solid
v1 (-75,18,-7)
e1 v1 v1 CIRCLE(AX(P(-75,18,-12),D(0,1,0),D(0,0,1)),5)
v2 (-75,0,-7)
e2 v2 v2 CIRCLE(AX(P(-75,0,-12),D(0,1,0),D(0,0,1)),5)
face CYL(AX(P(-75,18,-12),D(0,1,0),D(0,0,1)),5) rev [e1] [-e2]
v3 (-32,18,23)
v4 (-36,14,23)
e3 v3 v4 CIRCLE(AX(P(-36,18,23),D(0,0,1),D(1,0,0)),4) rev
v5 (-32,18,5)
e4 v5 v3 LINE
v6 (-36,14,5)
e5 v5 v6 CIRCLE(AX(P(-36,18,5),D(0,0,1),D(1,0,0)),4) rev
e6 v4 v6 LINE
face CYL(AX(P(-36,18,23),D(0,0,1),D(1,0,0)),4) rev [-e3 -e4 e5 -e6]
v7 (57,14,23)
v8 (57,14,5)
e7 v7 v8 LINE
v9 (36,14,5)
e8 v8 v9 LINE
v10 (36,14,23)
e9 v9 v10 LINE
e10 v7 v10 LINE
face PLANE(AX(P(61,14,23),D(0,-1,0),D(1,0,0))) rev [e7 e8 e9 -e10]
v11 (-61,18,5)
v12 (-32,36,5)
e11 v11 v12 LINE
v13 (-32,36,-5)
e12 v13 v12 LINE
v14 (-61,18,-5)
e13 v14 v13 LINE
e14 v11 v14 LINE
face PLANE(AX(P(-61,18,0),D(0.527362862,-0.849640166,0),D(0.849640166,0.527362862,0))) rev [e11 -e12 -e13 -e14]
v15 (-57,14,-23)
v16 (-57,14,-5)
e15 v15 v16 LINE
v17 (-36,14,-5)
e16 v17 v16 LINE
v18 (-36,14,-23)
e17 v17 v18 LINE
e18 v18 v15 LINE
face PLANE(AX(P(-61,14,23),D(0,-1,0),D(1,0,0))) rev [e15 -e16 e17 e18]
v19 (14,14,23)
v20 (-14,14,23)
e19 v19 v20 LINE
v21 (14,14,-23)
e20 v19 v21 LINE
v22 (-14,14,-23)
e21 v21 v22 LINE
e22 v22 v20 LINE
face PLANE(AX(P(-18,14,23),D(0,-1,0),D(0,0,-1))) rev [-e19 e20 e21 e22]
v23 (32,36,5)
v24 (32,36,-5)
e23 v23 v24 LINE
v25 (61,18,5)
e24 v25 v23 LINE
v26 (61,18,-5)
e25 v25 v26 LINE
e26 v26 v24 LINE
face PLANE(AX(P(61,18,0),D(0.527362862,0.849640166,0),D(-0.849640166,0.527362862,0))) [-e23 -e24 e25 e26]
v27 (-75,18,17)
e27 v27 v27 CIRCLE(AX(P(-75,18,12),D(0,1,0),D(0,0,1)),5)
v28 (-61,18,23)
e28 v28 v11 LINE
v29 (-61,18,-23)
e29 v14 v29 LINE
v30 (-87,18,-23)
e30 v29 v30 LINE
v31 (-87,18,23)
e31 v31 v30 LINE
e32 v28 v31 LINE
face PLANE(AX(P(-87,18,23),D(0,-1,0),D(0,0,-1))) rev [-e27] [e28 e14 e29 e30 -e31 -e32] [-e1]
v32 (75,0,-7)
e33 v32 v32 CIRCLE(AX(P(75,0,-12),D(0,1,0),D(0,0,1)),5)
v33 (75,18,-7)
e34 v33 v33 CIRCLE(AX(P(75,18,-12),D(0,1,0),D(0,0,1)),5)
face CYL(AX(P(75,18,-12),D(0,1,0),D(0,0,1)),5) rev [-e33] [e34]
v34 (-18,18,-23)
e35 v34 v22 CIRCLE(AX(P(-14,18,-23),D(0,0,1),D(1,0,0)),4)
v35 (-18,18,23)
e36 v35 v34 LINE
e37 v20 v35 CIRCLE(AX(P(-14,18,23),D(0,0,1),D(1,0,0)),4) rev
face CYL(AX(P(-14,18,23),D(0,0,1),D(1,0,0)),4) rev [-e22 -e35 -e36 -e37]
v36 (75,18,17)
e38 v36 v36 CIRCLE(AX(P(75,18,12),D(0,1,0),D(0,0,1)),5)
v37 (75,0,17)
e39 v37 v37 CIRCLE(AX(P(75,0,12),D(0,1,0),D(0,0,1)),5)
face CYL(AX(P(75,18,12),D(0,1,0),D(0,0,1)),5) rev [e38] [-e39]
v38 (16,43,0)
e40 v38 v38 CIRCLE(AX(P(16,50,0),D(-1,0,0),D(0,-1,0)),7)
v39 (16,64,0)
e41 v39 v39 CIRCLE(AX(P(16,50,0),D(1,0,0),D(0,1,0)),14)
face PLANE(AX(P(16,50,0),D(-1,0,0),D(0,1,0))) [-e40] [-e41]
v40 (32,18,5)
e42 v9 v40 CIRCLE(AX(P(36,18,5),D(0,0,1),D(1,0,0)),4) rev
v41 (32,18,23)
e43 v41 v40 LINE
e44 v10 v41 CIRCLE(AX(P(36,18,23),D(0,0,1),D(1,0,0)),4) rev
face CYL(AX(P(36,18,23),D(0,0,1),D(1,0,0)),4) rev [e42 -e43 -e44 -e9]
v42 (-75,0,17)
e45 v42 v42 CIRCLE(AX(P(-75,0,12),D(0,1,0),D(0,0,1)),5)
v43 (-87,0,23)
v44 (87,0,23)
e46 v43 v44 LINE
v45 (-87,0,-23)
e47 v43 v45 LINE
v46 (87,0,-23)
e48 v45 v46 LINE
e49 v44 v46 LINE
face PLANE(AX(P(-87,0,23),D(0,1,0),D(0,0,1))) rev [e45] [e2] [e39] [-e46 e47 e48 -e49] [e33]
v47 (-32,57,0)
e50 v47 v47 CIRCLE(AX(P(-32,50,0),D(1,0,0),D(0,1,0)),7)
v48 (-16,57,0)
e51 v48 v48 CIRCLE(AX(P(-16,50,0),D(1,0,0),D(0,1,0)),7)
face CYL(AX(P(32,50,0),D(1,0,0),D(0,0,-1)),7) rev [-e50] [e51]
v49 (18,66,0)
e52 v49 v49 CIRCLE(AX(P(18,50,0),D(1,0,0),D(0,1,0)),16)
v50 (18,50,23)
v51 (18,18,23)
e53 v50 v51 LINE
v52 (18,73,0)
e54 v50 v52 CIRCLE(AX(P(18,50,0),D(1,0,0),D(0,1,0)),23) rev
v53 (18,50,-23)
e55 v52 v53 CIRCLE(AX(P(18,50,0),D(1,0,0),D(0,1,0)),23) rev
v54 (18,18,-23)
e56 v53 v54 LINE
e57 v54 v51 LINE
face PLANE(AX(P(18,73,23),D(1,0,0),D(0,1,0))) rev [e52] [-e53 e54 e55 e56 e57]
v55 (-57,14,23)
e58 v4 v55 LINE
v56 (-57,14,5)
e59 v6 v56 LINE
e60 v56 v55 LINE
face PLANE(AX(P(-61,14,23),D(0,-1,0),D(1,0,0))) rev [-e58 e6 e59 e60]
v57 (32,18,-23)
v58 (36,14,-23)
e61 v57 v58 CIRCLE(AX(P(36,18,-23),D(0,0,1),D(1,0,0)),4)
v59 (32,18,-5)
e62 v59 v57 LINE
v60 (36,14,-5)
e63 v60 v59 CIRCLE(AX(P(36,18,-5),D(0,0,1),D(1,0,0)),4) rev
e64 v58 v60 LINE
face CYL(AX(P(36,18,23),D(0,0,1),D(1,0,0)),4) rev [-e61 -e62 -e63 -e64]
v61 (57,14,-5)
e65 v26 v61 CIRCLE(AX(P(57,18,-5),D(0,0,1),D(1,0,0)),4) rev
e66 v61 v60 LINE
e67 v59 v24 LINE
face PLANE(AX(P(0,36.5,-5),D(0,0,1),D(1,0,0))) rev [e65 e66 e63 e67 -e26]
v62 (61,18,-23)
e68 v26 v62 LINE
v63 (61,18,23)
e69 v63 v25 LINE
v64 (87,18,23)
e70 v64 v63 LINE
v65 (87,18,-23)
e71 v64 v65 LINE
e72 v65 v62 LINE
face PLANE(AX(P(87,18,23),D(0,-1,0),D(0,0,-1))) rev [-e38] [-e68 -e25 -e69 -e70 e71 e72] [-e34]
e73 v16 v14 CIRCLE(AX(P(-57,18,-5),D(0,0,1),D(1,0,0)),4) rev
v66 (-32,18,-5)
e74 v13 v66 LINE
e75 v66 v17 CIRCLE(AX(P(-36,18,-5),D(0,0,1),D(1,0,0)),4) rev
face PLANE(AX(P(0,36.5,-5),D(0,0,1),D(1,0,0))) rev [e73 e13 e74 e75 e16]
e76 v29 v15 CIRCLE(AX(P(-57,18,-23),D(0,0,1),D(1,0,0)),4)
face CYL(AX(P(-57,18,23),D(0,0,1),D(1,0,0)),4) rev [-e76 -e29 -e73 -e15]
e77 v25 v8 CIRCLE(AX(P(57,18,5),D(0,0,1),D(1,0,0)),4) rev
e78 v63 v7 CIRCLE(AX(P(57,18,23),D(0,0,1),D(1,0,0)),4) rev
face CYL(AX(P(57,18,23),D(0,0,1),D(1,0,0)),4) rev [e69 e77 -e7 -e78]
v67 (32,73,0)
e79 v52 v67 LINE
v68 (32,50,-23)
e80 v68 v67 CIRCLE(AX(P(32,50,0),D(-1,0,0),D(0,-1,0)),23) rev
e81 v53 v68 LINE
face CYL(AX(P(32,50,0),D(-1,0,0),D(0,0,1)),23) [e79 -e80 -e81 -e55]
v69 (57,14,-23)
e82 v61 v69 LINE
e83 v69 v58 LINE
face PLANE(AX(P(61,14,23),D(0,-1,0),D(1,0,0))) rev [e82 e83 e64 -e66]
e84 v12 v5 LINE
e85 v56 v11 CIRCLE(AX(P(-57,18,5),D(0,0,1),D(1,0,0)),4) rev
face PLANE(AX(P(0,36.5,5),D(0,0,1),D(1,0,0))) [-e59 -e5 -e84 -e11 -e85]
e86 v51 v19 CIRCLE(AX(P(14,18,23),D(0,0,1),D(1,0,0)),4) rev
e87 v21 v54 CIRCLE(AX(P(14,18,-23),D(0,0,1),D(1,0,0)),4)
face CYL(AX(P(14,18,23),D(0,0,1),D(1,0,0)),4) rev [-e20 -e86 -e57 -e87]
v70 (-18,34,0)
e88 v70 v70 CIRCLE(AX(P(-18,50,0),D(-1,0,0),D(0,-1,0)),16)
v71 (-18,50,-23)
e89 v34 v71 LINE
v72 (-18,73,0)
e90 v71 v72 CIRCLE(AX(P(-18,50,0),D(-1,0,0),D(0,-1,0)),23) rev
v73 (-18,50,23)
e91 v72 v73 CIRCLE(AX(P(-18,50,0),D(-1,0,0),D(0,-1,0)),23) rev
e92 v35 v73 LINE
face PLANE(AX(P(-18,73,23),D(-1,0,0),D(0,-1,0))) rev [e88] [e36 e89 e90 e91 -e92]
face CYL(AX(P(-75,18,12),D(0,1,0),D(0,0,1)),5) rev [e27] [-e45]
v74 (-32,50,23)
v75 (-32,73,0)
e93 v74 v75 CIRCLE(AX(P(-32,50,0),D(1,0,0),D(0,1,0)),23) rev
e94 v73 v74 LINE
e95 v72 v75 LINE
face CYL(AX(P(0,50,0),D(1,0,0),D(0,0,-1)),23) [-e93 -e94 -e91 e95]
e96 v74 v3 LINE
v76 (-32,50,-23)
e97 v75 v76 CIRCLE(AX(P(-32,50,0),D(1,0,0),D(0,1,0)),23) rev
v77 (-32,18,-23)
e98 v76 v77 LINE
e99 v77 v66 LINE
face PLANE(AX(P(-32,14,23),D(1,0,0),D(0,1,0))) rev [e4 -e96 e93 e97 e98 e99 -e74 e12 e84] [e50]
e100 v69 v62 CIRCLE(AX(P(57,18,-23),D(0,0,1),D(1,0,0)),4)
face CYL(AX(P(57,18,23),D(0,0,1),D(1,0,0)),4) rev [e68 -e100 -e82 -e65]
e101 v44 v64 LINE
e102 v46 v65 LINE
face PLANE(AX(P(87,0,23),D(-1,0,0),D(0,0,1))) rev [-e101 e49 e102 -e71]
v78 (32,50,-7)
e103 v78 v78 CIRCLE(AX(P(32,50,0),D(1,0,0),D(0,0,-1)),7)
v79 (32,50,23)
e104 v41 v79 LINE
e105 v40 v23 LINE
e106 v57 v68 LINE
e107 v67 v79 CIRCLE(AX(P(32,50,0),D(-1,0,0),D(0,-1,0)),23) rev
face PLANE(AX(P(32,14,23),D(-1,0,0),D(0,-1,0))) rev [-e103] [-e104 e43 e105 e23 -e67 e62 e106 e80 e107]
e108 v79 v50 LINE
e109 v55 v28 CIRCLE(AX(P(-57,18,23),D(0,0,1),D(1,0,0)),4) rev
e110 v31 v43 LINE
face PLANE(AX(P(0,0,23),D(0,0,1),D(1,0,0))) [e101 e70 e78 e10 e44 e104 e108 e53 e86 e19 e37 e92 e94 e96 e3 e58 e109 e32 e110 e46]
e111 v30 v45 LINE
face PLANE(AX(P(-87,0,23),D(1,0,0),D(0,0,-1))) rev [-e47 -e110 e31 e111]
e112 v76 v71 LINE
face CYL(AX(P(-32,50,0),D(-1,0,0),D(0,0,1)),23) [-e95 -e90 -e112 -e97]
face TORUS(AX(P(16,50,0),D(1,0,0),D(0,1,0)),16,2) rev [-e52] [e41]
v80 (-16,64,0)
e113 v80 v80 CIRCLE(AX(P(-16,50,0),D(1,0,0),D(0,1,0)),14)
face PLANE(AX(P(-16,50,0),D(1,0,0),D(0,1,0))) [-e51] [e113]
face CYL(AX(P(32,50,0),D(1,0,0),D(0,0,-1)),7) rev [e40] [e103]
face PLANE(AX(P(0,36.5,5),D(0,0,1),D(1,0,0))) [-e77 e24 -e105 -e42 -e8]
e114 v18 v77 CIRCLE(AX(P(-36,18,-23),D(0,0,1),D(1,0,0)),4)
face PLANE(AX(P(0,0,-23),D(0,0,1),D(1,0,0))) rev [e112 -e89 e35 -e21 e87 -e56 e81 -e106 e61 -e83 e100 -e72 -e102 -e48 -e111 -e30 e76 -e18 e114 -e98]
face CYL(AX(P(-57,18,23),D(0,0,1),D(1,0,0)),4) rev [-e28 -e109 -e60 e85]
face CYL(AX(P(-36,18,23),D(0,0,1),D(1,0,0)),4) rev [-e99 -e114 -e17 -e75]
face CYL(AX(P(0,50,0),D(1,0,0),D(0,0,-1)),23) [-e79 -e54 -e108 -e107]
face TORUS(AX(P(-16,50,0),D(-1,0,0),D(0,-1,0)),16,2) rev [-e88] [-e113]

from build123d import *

# Parameters (mm, degrees)
BOSS_EXTRUDE1_DEPTH = 23
FILLET1_R           = 23
SKETCH2_R           = 14
BOSS_EXTRUDE2_DEPTH = 2
HOLE1_D             = 14
FILLET2_R           = 2
FILLET3_R           = 4
RIB1_REACH          = 117.875
SKETCH5_WALL_W      = 267.881961488
SKETCH5_WALL_H      = 10
HOLE2_D             = 10


with BuildPart() as part:
    # Sketch1 → Boss-Extrude1 (new, symmetric)
    with BuildSketch(Plane.XY):
        Polygon((-87, 0), (-87, 18), (-61, 18), (-61, 14), (-32, 14), (-32, 73), (-18, 73), (-18, 14), (18, 14), (18, 73), (32, 73), (32, 14), (61, 14), (61, 18), (87, 18), (87, 0), align=None)
    extrude(amount=BOSS_EXTRUDE1_DEPTH, both=True)

    # Fillet1
    fillet1_edges = [part.edges().sort_by_distance(p)[0] for p in [
        (-25, 73, 23),
        (-25, 73, -23),
        (25, 73, -23),
        (25, 73, 23),
    ]]
    fillet(fillet1_edges, radius=FILLET1_R - 0.0001)  # a hair under: the kernel refuses the full size

    # Sketch2 → Boss-Extrude2 (add)
    with BuildSketch(Plane(origin=(-18, 0, 0), x_dir=(0, 0, -1), z_dir=(1, 0, 0))):
        with Locations(Location((0, 50, 0), (0, 0, 270))):
            Circle(SKETCH2_R)
    boss_extrude2 = extrude(amount=BOSS_EXTRUDE2_DEPTH)

    # Mirror1: Boss-Extrude2 across plane
    add(boss_extrude2.mirror(Plane(origin=(0, 0, 0), x_dir=(0, 0, 1), z_dir=(1, 0, 0))))

    # Hole1 (through all)
    with Locations(Plane(origin=(32, 0, 0), x_dir=(0, 0, -1), z_dir=(1, 0, 0))):
        with Locations((0, 50)):
            Hole(HOLE1_D / 2)

    # Fillet2
    fillet2_edges = [part.edges().sort_by_distance(p)[0] for p in [
        (-18, 64, 0),
        (18, 64, 0),
    ]]
    fillet(fillet2_edges, radius=FILLET2_R - 0.0001)  # a hair under: the kernel refuses the full size

    # Fillet3
    fillet3_edges = [part.edges().sort_by_distance(p)[0] for p in [
        (-32, 14, 0),
        (18, 14, 0),
        (61, 14, 0),
        (32, 14, 0),
        (-18, 14, 0),
        (-61, 14, 0),
    ]]
    fillet(fillet3_edges, radius=FILLET3_R - 0.0001)  # a hair under: the kernel refuses the full size

    # Sketch5 wall → Rib1 (add, up to next)
    with BuildSketch(Plane(origin=(46.5, 27, 0), x_dir=(-0.849640166198, 0.527362861778, 0), z_dir=(-0.527362861778, -0.849640166198, 0)), mode=Mode.PRIVATE) as rib1_sk1:
        Rectangle(SKETCH5_WALL_W, SKETCH5_WALL_H)
    rib1_tool1 = extrude(rib1_sk1.sketch, amount=RIB1_REACH, mode=Mode.PRIVATE) - part.part
    rib1 = rib1_tool1.solids().sort_by_distance((46.5, 27, 0))[0]
    add(rib1)

    # Mirror2: Rib1 across plane
    add(rib1.mirror(Plane(origin=(0, 0, 0), x_dir=(0, 0, 1), z_dir=(1, 0, 0))))

    # Hole2 (through all)
    with Locations(Plane(origin=(0, 18, 0), x_dir=(1, 0, 0), z_dir=(0, 1, 0))):
        with Locations((75, 12), (75, -12)):
            hole2 = Hole(HOLE2_D / 2)

    # Mirror3: Hole2 across plane
    add(hole2.mirror(Plane(origin=(0, 0, 0), x_dir=(0, 0, 1), z_dir=(1, 0, 0))), mode=Mode.SUBTRACT)


solid = part.part
